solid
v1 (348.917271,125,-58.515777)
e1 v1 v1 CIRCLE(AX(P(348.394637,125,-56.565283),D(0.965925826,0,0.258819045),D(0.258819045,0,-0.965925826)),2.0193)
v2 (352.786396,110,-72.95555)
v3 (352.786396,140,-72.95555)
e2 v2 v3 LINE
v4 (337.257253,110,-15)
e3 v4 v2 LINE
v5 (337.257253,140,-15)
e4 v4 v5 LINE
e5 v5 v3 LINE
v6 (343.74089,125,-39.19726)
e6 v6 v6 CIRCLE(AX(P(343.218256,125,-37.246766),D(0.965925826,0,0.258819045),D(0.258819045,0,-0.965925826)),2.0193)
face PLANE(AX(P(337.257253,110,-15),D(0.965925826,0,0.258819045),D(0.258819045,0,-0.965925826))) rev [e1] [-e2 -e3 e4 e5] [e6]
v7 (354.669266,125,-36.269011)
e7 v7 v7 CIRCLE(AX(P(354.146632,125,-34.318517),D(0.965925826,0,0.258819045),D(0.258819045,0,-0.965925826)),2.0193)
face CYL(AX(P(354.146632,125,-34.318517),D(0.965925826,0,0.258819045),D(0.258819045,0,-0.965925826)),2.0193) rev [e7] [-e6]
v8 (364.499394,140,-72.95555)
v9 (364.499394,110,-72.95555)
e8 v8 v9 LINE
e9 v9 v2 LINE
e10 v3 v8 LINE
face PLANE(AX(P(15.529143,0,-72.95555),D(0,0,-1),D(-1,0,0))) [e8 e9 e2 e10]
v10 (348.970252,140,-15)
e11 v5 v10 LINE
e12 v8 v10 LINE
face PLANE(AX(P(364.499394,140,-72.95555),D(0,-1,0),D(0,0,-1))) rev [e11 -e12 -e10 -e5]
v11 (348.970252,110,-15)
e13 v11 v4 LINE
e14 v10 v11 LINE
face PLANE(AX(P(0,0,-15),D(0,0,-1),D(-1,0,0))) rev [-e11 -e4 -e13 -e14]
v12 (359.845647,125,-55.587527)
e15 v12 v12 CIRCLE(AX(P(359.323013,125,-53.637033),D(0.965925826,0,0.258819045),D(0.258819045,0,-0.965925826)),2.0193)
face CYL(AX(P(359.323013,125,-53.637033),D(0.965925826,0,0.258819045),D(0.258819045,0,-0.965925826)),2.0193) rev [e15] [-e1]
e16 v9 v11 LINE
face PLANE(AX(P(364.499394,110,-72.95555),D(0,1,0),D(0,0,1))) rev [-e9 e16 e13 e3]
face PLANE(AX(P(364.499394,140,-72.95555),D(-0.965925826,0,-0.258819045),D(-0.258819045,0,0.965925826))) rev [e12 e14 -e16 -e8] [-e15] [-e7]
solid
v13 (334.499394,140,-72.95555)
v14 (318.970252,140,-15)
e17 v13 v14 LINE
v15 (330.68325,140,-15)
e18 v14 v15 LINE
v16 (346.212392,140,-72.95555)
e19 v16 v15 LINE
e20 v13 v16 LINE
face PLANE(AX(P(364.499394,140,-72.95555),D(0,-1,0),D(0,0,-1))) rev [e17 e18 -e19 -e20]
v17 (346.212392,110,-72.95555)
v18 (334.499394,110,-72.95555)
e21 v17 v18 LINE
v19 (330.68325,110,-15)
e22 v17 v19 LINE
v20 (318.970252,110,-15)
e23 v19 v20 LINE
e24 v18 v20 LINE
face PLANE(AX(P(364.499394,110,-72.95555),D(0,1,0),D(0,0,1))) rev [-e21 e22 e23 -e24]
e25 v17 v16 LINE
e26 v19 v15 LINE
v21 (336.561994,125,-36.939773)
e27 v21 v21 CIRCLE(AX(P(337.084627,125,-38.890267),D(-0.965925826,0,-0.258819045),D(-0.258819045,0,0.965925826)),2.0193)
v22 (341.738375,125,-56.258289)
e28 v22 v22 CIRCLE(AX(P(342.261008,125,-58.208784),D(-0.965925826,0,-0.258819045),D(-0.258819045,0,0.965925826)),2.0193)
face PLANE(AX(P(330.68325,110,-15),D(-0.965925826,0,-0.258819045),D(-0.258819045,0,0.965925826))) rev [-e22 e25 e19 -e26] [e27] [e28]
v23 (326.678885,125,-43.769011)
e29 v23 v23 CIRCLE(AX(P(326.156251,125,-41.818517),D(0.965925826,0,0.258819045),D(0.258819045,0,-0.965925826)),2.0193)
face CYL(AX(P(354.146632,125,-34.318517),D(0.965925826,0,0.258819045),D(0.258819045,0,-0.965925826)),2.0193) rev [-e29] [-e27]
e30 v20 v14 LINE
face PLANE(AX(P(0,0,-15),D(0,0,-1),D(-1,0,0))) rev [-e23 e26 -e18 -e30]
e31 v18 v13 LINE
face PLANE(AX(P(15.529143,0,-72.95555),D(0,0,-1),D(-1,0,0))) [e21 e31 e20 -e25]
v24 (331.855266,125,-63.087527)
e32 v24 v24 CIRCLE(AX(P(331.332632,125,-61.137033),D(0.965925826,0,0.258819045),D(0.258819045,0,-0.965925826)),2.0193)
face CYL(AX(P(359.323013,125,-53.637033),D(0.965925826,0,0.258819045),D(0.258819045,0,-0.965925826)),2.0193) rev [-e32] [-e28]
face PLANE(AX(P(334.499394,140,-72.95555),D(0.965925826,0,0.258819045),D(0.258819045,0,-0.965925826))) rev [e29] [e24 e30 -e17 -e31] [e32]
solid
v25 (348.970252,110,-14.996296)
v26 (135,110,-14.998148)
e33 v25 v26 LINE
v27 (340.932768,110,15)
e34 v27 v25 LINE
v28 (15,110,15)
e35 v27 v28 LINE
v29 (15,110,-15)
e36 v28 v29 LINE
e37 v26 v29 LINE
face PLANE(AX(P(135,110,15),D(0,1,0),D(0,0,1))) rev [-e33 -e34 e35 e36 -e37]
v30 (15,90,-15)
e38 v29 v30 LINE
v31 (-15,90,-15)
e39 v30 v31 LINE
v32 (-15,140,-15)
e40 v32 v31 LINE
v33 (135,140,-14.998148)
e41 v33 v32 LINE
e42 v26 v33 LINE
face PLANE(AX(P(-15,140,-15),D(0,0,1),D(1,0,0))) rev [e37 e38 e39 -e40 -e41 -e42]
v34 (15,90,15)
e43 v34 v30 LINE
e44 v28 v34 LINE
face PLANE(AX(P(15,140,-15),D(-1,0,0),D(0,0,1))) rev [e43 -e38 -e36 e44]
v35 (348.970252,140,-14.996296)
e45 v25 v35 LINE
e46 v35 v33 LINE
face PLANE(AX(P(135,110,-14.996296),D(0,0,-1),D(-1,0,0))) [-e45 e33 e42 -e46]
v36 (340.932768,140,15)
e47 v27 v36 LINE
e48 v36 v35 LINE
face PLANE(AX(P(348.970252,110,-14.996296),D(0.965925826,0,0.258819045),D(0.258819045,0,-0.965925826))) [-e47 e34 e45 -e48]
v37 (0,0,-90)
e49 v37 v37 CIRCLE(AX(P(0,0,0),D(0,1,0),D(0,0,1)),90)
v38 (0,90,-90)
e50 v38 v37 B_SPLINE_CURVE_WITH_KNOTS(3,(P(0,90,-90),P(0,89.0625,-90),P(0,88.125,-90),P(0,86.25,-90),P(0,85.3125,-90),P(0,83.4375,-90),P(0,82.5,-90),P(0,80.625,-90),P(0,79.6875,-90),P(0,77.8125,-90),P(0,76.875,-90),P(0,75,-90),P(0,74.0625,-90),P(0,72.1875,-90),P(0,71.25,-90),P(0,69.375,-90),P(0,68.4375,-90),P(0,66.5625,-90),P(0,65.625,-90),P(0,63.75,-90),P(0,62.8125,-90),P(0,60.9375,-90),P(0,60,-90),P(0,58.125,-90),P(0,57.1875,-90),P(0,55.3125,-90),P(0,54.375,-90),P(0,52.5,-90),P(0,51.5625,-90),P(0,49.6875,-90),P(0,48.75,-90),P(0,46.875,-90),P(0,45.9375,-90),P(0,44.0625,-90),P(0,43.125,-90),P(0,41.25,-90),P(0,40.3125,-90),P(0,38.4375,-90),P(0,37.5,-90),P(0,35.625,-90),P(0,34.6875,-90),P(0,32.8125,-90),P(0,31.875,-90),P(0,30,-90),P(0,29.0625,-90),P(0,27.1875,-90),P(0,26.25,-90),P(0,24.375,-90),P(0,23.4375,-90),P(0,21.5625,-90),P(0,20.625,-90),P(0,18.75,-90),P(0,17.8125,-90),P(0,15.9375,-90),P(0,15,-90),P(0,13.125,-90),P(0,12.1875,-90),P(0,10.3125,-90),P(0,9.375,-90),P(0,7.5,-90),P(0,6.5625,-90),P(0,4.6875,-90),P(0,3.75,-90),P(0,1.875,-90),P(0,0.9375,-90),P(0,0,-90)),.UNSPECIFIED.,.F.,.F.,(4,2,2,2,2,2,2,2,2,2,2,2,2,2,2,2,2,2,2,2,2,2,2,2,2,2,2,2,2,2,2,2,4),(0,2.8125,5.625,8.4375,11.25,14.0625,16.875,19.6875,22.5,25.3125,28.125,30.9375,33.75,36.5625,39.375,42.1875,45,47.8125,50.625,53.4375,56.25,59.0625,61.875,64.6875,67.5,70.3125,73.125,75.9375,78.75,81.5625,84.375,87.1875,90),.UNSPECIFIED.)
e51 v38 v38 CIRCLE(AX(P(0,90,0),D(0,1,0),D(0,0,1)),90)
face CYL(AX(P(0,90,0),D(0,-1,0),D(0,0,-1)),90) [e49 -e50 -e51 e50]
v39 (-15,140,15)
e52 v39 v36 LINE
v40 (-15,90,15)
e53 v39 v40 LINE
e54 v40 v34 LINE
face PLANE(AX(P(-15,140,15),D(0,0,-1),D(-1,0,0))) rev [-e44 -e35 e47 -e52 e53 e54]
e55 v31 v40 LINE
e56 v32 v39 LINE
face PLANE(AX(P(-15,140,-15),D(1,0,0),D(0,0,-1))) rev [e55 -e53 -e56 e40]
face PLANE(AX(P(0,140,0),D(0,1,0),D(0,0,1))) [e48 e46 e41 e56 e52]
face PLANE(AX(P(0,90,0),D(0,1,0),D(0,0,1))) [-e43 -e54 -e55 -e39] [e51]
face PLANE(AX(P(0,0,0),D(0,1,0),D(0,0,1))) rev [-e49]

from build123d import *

# Parameters (mm, degrees)
SKETCH1_R                       = 90
BOSS_EXTRUDE1_DEPTH             = 90
SKETCH2_W                       = 30
SKETCH2_H                       = 30
BOSS_EXTRUDE2_DEPTH             = 50
SKETCH3_W                       = 30
SKETCH3_H                       = 30
BOSS_EXTRUDE3_DEPTH             = 120
BOSS_EXTRUDE4_START             = -30
BOSS_EXTRUDE4_DEPTH             = 30
BOSS_EXTRUDE5_START             = 110
BOSS_EXTRUDE5_DEPTH             = 30
CUT_EXTRUDE1_DEPTH              = 30
SKETCH8_W                       = 2.0193
SKETCH8_H                       = 443.424131357
F_10_32_TAPPED_HOLE1_AT_2_COUNT = 2
F_10_32_TAPPED_HOLE1_AT_2_PITCH = 20


# Read off the part's stored shape, not the designer's step: Boss-Extrude5
with BuildPart() as part:
    # Sketch1 → Boss-Extrude1 (new body)
    with BuildSketch(Plane(origin=(0, 0, 0), x_dir=(1, 0, 0), z_dir=(0, 1, 0))):
        with Locations(Location((0, 0, 0), (0, 0, 90))):
            Circle(SKETCH1_R)
    extrude(amount=BOSS_EXTRUDE1_DEPTH)

    # Sketch2 → Boss-Extrude2 (add)
    with BuildSketch(Plane(origin=(0, 90, 0), x_dir=(1, 0, 0), z_dir=(0, 1, 0))):
        Rectangle(SKETCH2_W, SKETCH2_H)
    extrude(amount=BOSS_EXTRUDE2_DEPTH)

    # Sketch3 → Boss-Extrude3 (add)
    with BuildSketch(Plane(origin=(15, 0, 0), x_dir=(0, 0, -1), z_dir=(1, 0, 0))):
        with Locations((0, 125)):
            Rectangle(SKETCH3_W, SKETCH3_H)
    extrude(amount=BOSS_EXTRUDE3_DEPTH)

    # Sketch4 → Boss-Extrude4 (add)
    with BuildSketch(Plane(origin=(0, 140, 0), x_dir=(1, 0, 0), z_dir=(0, 1, 0)).offset(BOSS_EXTRUDE4_START)):
        Polygon((348.970251581, 14.996296245), (340.932768226, -15), (135, -15), (135, 14.996296245), align=None)
    extrude(amount=BOSS_EXTRUDE4_DEPTH)


with BuildPart() as body_2:
    # Boss-Extrude5 outline → Boss-Extrude5 (new body)
    with BuildSketch(Plane(origin=(0, 0, 0), x_dir=(1, 0, 0), z_dir=(0, 1, 0)).offset(BOSS_EXTRUDE5_START)):
        Polygon((348.970251581, 15), (364.499394287, 72.955549577), (334.499394287, 72.955549577), (318.970251581, 15), align=None)
    extrude(amount=BOSS_EXTRUDE5_DEPTH)

    # Sketch6 → Cut-Extrude1 (cut)
    with BuildSketch(Plane(origin=(0, 140, 0), x_dir=(1, 0, 0), z_dir=(0, 1, 0))):
        Polygon((337.257253453, 15), (352.78639616, 72.955549577), (346.212392414, 72.955549577), (330.683249708, 15), align=None)
    extrude(amount=-CUT_EXTRUDE1_DEPTH, mode=Mode.SUBTRACT)


with BuildPart() as cut_extrude1_piece_1:
    # of the separate pieces the step leaves, piece 1, a body of its own (cut_extrude1_pieces)
    add(body_2.part.solids().sort_by_distance((348.970251581, 110, -15))[0])


with BuildPart() as cut_extrude1_piece_2:
    # of the separate pieces the step leaves, piece 2, a body of its own (cut_extrude1_pieces)
    add(body_2.part.solids().sort_by_distance((318.970251581, 110, -15))[0])


with BuildPart() as f_10_32_tapped_hole1_tool:
    # Sketch8 → #10-32 Tapped Hole1 (revolve)
    with BuildSketch(Plane(origin=(359.323013385, 125, -53.637033052), x_dir=(0.2588190451025241, 0, -0.9659258262890675), z_dir=(0, 1, 0))):
        with Locations((1.00965, 221.712065679)):
            Rectangle(SKETCH8_W, SKETCH8_H)
    f_10_32_tapped_hole1 = revolve(axis=Axis((365.456642382, 125, -51.993532115), (-0.9659258262890674, 0, -0.2588190451025241)))


with BuildPart() as cut_extrude1_piece_1_1:
    add(cut_extrude1_piece_1.part)

    # #10-32 Tapped Hole1: cut by f_10_32_tapped_hole1_tool
    add(f_10_32_tapped_hole1_tool.part, mode=Mode.SUBTRACT)


with BuildPart() as cut_extrude1_piece_2_1:
    add(cut_extrude1_piece_2.part)

    # #10-32 Tapped Hole1: cut by f_10_32_tapped_hole1_tool
    add(f_10_32_tapped_hole1_tool.part, mode=Mode.SUBTRACT)


with BuildPart() as f_10_32_tapped_hole1_at_2_tool:
    # #10-32 Tapped Hole1 at 2: #10-32 Tapped Hole1 ×2
    with Locations(*[Vector(-0.2588190451025241, 0, 0.9659258262890674) * (i * F_10_32_TAPPED_HOLE1_AT_2_PITCH) for i in range(1, F_10_32_TAPPED_HOLE1_AT_2_COUNT)]):
        add(f_10_32_tapped_hole1)


with BuildPart() as cut_extrude1_piece_1_2:
    add(cut_extrude1_piece_1_1.part)

    # #10-32 Tapped Hole1 at 2: cut by f_10_32_tapped_hole1_at_2_tool
    add(f_10_32_tapped_hole1_at_2_tool.part, mode=Mode.SUBTRACT)


with BuildPart() as cut_extrude1_piece_2_2:
    add(cut_extrude1_piece_2_1.part)

    # #10-32 Tapped Hole1 at 2: cut by f_10_32_tapped_hole1_at_2_tool
    add(f_10_32_tapped_hole1_at_2_tool.part, mode=Mode.SUBTRACT)


solid = Compound([part.part, cut_extrude1_piece_1_2.part, cut_extrude1_piece_2_2.part])
